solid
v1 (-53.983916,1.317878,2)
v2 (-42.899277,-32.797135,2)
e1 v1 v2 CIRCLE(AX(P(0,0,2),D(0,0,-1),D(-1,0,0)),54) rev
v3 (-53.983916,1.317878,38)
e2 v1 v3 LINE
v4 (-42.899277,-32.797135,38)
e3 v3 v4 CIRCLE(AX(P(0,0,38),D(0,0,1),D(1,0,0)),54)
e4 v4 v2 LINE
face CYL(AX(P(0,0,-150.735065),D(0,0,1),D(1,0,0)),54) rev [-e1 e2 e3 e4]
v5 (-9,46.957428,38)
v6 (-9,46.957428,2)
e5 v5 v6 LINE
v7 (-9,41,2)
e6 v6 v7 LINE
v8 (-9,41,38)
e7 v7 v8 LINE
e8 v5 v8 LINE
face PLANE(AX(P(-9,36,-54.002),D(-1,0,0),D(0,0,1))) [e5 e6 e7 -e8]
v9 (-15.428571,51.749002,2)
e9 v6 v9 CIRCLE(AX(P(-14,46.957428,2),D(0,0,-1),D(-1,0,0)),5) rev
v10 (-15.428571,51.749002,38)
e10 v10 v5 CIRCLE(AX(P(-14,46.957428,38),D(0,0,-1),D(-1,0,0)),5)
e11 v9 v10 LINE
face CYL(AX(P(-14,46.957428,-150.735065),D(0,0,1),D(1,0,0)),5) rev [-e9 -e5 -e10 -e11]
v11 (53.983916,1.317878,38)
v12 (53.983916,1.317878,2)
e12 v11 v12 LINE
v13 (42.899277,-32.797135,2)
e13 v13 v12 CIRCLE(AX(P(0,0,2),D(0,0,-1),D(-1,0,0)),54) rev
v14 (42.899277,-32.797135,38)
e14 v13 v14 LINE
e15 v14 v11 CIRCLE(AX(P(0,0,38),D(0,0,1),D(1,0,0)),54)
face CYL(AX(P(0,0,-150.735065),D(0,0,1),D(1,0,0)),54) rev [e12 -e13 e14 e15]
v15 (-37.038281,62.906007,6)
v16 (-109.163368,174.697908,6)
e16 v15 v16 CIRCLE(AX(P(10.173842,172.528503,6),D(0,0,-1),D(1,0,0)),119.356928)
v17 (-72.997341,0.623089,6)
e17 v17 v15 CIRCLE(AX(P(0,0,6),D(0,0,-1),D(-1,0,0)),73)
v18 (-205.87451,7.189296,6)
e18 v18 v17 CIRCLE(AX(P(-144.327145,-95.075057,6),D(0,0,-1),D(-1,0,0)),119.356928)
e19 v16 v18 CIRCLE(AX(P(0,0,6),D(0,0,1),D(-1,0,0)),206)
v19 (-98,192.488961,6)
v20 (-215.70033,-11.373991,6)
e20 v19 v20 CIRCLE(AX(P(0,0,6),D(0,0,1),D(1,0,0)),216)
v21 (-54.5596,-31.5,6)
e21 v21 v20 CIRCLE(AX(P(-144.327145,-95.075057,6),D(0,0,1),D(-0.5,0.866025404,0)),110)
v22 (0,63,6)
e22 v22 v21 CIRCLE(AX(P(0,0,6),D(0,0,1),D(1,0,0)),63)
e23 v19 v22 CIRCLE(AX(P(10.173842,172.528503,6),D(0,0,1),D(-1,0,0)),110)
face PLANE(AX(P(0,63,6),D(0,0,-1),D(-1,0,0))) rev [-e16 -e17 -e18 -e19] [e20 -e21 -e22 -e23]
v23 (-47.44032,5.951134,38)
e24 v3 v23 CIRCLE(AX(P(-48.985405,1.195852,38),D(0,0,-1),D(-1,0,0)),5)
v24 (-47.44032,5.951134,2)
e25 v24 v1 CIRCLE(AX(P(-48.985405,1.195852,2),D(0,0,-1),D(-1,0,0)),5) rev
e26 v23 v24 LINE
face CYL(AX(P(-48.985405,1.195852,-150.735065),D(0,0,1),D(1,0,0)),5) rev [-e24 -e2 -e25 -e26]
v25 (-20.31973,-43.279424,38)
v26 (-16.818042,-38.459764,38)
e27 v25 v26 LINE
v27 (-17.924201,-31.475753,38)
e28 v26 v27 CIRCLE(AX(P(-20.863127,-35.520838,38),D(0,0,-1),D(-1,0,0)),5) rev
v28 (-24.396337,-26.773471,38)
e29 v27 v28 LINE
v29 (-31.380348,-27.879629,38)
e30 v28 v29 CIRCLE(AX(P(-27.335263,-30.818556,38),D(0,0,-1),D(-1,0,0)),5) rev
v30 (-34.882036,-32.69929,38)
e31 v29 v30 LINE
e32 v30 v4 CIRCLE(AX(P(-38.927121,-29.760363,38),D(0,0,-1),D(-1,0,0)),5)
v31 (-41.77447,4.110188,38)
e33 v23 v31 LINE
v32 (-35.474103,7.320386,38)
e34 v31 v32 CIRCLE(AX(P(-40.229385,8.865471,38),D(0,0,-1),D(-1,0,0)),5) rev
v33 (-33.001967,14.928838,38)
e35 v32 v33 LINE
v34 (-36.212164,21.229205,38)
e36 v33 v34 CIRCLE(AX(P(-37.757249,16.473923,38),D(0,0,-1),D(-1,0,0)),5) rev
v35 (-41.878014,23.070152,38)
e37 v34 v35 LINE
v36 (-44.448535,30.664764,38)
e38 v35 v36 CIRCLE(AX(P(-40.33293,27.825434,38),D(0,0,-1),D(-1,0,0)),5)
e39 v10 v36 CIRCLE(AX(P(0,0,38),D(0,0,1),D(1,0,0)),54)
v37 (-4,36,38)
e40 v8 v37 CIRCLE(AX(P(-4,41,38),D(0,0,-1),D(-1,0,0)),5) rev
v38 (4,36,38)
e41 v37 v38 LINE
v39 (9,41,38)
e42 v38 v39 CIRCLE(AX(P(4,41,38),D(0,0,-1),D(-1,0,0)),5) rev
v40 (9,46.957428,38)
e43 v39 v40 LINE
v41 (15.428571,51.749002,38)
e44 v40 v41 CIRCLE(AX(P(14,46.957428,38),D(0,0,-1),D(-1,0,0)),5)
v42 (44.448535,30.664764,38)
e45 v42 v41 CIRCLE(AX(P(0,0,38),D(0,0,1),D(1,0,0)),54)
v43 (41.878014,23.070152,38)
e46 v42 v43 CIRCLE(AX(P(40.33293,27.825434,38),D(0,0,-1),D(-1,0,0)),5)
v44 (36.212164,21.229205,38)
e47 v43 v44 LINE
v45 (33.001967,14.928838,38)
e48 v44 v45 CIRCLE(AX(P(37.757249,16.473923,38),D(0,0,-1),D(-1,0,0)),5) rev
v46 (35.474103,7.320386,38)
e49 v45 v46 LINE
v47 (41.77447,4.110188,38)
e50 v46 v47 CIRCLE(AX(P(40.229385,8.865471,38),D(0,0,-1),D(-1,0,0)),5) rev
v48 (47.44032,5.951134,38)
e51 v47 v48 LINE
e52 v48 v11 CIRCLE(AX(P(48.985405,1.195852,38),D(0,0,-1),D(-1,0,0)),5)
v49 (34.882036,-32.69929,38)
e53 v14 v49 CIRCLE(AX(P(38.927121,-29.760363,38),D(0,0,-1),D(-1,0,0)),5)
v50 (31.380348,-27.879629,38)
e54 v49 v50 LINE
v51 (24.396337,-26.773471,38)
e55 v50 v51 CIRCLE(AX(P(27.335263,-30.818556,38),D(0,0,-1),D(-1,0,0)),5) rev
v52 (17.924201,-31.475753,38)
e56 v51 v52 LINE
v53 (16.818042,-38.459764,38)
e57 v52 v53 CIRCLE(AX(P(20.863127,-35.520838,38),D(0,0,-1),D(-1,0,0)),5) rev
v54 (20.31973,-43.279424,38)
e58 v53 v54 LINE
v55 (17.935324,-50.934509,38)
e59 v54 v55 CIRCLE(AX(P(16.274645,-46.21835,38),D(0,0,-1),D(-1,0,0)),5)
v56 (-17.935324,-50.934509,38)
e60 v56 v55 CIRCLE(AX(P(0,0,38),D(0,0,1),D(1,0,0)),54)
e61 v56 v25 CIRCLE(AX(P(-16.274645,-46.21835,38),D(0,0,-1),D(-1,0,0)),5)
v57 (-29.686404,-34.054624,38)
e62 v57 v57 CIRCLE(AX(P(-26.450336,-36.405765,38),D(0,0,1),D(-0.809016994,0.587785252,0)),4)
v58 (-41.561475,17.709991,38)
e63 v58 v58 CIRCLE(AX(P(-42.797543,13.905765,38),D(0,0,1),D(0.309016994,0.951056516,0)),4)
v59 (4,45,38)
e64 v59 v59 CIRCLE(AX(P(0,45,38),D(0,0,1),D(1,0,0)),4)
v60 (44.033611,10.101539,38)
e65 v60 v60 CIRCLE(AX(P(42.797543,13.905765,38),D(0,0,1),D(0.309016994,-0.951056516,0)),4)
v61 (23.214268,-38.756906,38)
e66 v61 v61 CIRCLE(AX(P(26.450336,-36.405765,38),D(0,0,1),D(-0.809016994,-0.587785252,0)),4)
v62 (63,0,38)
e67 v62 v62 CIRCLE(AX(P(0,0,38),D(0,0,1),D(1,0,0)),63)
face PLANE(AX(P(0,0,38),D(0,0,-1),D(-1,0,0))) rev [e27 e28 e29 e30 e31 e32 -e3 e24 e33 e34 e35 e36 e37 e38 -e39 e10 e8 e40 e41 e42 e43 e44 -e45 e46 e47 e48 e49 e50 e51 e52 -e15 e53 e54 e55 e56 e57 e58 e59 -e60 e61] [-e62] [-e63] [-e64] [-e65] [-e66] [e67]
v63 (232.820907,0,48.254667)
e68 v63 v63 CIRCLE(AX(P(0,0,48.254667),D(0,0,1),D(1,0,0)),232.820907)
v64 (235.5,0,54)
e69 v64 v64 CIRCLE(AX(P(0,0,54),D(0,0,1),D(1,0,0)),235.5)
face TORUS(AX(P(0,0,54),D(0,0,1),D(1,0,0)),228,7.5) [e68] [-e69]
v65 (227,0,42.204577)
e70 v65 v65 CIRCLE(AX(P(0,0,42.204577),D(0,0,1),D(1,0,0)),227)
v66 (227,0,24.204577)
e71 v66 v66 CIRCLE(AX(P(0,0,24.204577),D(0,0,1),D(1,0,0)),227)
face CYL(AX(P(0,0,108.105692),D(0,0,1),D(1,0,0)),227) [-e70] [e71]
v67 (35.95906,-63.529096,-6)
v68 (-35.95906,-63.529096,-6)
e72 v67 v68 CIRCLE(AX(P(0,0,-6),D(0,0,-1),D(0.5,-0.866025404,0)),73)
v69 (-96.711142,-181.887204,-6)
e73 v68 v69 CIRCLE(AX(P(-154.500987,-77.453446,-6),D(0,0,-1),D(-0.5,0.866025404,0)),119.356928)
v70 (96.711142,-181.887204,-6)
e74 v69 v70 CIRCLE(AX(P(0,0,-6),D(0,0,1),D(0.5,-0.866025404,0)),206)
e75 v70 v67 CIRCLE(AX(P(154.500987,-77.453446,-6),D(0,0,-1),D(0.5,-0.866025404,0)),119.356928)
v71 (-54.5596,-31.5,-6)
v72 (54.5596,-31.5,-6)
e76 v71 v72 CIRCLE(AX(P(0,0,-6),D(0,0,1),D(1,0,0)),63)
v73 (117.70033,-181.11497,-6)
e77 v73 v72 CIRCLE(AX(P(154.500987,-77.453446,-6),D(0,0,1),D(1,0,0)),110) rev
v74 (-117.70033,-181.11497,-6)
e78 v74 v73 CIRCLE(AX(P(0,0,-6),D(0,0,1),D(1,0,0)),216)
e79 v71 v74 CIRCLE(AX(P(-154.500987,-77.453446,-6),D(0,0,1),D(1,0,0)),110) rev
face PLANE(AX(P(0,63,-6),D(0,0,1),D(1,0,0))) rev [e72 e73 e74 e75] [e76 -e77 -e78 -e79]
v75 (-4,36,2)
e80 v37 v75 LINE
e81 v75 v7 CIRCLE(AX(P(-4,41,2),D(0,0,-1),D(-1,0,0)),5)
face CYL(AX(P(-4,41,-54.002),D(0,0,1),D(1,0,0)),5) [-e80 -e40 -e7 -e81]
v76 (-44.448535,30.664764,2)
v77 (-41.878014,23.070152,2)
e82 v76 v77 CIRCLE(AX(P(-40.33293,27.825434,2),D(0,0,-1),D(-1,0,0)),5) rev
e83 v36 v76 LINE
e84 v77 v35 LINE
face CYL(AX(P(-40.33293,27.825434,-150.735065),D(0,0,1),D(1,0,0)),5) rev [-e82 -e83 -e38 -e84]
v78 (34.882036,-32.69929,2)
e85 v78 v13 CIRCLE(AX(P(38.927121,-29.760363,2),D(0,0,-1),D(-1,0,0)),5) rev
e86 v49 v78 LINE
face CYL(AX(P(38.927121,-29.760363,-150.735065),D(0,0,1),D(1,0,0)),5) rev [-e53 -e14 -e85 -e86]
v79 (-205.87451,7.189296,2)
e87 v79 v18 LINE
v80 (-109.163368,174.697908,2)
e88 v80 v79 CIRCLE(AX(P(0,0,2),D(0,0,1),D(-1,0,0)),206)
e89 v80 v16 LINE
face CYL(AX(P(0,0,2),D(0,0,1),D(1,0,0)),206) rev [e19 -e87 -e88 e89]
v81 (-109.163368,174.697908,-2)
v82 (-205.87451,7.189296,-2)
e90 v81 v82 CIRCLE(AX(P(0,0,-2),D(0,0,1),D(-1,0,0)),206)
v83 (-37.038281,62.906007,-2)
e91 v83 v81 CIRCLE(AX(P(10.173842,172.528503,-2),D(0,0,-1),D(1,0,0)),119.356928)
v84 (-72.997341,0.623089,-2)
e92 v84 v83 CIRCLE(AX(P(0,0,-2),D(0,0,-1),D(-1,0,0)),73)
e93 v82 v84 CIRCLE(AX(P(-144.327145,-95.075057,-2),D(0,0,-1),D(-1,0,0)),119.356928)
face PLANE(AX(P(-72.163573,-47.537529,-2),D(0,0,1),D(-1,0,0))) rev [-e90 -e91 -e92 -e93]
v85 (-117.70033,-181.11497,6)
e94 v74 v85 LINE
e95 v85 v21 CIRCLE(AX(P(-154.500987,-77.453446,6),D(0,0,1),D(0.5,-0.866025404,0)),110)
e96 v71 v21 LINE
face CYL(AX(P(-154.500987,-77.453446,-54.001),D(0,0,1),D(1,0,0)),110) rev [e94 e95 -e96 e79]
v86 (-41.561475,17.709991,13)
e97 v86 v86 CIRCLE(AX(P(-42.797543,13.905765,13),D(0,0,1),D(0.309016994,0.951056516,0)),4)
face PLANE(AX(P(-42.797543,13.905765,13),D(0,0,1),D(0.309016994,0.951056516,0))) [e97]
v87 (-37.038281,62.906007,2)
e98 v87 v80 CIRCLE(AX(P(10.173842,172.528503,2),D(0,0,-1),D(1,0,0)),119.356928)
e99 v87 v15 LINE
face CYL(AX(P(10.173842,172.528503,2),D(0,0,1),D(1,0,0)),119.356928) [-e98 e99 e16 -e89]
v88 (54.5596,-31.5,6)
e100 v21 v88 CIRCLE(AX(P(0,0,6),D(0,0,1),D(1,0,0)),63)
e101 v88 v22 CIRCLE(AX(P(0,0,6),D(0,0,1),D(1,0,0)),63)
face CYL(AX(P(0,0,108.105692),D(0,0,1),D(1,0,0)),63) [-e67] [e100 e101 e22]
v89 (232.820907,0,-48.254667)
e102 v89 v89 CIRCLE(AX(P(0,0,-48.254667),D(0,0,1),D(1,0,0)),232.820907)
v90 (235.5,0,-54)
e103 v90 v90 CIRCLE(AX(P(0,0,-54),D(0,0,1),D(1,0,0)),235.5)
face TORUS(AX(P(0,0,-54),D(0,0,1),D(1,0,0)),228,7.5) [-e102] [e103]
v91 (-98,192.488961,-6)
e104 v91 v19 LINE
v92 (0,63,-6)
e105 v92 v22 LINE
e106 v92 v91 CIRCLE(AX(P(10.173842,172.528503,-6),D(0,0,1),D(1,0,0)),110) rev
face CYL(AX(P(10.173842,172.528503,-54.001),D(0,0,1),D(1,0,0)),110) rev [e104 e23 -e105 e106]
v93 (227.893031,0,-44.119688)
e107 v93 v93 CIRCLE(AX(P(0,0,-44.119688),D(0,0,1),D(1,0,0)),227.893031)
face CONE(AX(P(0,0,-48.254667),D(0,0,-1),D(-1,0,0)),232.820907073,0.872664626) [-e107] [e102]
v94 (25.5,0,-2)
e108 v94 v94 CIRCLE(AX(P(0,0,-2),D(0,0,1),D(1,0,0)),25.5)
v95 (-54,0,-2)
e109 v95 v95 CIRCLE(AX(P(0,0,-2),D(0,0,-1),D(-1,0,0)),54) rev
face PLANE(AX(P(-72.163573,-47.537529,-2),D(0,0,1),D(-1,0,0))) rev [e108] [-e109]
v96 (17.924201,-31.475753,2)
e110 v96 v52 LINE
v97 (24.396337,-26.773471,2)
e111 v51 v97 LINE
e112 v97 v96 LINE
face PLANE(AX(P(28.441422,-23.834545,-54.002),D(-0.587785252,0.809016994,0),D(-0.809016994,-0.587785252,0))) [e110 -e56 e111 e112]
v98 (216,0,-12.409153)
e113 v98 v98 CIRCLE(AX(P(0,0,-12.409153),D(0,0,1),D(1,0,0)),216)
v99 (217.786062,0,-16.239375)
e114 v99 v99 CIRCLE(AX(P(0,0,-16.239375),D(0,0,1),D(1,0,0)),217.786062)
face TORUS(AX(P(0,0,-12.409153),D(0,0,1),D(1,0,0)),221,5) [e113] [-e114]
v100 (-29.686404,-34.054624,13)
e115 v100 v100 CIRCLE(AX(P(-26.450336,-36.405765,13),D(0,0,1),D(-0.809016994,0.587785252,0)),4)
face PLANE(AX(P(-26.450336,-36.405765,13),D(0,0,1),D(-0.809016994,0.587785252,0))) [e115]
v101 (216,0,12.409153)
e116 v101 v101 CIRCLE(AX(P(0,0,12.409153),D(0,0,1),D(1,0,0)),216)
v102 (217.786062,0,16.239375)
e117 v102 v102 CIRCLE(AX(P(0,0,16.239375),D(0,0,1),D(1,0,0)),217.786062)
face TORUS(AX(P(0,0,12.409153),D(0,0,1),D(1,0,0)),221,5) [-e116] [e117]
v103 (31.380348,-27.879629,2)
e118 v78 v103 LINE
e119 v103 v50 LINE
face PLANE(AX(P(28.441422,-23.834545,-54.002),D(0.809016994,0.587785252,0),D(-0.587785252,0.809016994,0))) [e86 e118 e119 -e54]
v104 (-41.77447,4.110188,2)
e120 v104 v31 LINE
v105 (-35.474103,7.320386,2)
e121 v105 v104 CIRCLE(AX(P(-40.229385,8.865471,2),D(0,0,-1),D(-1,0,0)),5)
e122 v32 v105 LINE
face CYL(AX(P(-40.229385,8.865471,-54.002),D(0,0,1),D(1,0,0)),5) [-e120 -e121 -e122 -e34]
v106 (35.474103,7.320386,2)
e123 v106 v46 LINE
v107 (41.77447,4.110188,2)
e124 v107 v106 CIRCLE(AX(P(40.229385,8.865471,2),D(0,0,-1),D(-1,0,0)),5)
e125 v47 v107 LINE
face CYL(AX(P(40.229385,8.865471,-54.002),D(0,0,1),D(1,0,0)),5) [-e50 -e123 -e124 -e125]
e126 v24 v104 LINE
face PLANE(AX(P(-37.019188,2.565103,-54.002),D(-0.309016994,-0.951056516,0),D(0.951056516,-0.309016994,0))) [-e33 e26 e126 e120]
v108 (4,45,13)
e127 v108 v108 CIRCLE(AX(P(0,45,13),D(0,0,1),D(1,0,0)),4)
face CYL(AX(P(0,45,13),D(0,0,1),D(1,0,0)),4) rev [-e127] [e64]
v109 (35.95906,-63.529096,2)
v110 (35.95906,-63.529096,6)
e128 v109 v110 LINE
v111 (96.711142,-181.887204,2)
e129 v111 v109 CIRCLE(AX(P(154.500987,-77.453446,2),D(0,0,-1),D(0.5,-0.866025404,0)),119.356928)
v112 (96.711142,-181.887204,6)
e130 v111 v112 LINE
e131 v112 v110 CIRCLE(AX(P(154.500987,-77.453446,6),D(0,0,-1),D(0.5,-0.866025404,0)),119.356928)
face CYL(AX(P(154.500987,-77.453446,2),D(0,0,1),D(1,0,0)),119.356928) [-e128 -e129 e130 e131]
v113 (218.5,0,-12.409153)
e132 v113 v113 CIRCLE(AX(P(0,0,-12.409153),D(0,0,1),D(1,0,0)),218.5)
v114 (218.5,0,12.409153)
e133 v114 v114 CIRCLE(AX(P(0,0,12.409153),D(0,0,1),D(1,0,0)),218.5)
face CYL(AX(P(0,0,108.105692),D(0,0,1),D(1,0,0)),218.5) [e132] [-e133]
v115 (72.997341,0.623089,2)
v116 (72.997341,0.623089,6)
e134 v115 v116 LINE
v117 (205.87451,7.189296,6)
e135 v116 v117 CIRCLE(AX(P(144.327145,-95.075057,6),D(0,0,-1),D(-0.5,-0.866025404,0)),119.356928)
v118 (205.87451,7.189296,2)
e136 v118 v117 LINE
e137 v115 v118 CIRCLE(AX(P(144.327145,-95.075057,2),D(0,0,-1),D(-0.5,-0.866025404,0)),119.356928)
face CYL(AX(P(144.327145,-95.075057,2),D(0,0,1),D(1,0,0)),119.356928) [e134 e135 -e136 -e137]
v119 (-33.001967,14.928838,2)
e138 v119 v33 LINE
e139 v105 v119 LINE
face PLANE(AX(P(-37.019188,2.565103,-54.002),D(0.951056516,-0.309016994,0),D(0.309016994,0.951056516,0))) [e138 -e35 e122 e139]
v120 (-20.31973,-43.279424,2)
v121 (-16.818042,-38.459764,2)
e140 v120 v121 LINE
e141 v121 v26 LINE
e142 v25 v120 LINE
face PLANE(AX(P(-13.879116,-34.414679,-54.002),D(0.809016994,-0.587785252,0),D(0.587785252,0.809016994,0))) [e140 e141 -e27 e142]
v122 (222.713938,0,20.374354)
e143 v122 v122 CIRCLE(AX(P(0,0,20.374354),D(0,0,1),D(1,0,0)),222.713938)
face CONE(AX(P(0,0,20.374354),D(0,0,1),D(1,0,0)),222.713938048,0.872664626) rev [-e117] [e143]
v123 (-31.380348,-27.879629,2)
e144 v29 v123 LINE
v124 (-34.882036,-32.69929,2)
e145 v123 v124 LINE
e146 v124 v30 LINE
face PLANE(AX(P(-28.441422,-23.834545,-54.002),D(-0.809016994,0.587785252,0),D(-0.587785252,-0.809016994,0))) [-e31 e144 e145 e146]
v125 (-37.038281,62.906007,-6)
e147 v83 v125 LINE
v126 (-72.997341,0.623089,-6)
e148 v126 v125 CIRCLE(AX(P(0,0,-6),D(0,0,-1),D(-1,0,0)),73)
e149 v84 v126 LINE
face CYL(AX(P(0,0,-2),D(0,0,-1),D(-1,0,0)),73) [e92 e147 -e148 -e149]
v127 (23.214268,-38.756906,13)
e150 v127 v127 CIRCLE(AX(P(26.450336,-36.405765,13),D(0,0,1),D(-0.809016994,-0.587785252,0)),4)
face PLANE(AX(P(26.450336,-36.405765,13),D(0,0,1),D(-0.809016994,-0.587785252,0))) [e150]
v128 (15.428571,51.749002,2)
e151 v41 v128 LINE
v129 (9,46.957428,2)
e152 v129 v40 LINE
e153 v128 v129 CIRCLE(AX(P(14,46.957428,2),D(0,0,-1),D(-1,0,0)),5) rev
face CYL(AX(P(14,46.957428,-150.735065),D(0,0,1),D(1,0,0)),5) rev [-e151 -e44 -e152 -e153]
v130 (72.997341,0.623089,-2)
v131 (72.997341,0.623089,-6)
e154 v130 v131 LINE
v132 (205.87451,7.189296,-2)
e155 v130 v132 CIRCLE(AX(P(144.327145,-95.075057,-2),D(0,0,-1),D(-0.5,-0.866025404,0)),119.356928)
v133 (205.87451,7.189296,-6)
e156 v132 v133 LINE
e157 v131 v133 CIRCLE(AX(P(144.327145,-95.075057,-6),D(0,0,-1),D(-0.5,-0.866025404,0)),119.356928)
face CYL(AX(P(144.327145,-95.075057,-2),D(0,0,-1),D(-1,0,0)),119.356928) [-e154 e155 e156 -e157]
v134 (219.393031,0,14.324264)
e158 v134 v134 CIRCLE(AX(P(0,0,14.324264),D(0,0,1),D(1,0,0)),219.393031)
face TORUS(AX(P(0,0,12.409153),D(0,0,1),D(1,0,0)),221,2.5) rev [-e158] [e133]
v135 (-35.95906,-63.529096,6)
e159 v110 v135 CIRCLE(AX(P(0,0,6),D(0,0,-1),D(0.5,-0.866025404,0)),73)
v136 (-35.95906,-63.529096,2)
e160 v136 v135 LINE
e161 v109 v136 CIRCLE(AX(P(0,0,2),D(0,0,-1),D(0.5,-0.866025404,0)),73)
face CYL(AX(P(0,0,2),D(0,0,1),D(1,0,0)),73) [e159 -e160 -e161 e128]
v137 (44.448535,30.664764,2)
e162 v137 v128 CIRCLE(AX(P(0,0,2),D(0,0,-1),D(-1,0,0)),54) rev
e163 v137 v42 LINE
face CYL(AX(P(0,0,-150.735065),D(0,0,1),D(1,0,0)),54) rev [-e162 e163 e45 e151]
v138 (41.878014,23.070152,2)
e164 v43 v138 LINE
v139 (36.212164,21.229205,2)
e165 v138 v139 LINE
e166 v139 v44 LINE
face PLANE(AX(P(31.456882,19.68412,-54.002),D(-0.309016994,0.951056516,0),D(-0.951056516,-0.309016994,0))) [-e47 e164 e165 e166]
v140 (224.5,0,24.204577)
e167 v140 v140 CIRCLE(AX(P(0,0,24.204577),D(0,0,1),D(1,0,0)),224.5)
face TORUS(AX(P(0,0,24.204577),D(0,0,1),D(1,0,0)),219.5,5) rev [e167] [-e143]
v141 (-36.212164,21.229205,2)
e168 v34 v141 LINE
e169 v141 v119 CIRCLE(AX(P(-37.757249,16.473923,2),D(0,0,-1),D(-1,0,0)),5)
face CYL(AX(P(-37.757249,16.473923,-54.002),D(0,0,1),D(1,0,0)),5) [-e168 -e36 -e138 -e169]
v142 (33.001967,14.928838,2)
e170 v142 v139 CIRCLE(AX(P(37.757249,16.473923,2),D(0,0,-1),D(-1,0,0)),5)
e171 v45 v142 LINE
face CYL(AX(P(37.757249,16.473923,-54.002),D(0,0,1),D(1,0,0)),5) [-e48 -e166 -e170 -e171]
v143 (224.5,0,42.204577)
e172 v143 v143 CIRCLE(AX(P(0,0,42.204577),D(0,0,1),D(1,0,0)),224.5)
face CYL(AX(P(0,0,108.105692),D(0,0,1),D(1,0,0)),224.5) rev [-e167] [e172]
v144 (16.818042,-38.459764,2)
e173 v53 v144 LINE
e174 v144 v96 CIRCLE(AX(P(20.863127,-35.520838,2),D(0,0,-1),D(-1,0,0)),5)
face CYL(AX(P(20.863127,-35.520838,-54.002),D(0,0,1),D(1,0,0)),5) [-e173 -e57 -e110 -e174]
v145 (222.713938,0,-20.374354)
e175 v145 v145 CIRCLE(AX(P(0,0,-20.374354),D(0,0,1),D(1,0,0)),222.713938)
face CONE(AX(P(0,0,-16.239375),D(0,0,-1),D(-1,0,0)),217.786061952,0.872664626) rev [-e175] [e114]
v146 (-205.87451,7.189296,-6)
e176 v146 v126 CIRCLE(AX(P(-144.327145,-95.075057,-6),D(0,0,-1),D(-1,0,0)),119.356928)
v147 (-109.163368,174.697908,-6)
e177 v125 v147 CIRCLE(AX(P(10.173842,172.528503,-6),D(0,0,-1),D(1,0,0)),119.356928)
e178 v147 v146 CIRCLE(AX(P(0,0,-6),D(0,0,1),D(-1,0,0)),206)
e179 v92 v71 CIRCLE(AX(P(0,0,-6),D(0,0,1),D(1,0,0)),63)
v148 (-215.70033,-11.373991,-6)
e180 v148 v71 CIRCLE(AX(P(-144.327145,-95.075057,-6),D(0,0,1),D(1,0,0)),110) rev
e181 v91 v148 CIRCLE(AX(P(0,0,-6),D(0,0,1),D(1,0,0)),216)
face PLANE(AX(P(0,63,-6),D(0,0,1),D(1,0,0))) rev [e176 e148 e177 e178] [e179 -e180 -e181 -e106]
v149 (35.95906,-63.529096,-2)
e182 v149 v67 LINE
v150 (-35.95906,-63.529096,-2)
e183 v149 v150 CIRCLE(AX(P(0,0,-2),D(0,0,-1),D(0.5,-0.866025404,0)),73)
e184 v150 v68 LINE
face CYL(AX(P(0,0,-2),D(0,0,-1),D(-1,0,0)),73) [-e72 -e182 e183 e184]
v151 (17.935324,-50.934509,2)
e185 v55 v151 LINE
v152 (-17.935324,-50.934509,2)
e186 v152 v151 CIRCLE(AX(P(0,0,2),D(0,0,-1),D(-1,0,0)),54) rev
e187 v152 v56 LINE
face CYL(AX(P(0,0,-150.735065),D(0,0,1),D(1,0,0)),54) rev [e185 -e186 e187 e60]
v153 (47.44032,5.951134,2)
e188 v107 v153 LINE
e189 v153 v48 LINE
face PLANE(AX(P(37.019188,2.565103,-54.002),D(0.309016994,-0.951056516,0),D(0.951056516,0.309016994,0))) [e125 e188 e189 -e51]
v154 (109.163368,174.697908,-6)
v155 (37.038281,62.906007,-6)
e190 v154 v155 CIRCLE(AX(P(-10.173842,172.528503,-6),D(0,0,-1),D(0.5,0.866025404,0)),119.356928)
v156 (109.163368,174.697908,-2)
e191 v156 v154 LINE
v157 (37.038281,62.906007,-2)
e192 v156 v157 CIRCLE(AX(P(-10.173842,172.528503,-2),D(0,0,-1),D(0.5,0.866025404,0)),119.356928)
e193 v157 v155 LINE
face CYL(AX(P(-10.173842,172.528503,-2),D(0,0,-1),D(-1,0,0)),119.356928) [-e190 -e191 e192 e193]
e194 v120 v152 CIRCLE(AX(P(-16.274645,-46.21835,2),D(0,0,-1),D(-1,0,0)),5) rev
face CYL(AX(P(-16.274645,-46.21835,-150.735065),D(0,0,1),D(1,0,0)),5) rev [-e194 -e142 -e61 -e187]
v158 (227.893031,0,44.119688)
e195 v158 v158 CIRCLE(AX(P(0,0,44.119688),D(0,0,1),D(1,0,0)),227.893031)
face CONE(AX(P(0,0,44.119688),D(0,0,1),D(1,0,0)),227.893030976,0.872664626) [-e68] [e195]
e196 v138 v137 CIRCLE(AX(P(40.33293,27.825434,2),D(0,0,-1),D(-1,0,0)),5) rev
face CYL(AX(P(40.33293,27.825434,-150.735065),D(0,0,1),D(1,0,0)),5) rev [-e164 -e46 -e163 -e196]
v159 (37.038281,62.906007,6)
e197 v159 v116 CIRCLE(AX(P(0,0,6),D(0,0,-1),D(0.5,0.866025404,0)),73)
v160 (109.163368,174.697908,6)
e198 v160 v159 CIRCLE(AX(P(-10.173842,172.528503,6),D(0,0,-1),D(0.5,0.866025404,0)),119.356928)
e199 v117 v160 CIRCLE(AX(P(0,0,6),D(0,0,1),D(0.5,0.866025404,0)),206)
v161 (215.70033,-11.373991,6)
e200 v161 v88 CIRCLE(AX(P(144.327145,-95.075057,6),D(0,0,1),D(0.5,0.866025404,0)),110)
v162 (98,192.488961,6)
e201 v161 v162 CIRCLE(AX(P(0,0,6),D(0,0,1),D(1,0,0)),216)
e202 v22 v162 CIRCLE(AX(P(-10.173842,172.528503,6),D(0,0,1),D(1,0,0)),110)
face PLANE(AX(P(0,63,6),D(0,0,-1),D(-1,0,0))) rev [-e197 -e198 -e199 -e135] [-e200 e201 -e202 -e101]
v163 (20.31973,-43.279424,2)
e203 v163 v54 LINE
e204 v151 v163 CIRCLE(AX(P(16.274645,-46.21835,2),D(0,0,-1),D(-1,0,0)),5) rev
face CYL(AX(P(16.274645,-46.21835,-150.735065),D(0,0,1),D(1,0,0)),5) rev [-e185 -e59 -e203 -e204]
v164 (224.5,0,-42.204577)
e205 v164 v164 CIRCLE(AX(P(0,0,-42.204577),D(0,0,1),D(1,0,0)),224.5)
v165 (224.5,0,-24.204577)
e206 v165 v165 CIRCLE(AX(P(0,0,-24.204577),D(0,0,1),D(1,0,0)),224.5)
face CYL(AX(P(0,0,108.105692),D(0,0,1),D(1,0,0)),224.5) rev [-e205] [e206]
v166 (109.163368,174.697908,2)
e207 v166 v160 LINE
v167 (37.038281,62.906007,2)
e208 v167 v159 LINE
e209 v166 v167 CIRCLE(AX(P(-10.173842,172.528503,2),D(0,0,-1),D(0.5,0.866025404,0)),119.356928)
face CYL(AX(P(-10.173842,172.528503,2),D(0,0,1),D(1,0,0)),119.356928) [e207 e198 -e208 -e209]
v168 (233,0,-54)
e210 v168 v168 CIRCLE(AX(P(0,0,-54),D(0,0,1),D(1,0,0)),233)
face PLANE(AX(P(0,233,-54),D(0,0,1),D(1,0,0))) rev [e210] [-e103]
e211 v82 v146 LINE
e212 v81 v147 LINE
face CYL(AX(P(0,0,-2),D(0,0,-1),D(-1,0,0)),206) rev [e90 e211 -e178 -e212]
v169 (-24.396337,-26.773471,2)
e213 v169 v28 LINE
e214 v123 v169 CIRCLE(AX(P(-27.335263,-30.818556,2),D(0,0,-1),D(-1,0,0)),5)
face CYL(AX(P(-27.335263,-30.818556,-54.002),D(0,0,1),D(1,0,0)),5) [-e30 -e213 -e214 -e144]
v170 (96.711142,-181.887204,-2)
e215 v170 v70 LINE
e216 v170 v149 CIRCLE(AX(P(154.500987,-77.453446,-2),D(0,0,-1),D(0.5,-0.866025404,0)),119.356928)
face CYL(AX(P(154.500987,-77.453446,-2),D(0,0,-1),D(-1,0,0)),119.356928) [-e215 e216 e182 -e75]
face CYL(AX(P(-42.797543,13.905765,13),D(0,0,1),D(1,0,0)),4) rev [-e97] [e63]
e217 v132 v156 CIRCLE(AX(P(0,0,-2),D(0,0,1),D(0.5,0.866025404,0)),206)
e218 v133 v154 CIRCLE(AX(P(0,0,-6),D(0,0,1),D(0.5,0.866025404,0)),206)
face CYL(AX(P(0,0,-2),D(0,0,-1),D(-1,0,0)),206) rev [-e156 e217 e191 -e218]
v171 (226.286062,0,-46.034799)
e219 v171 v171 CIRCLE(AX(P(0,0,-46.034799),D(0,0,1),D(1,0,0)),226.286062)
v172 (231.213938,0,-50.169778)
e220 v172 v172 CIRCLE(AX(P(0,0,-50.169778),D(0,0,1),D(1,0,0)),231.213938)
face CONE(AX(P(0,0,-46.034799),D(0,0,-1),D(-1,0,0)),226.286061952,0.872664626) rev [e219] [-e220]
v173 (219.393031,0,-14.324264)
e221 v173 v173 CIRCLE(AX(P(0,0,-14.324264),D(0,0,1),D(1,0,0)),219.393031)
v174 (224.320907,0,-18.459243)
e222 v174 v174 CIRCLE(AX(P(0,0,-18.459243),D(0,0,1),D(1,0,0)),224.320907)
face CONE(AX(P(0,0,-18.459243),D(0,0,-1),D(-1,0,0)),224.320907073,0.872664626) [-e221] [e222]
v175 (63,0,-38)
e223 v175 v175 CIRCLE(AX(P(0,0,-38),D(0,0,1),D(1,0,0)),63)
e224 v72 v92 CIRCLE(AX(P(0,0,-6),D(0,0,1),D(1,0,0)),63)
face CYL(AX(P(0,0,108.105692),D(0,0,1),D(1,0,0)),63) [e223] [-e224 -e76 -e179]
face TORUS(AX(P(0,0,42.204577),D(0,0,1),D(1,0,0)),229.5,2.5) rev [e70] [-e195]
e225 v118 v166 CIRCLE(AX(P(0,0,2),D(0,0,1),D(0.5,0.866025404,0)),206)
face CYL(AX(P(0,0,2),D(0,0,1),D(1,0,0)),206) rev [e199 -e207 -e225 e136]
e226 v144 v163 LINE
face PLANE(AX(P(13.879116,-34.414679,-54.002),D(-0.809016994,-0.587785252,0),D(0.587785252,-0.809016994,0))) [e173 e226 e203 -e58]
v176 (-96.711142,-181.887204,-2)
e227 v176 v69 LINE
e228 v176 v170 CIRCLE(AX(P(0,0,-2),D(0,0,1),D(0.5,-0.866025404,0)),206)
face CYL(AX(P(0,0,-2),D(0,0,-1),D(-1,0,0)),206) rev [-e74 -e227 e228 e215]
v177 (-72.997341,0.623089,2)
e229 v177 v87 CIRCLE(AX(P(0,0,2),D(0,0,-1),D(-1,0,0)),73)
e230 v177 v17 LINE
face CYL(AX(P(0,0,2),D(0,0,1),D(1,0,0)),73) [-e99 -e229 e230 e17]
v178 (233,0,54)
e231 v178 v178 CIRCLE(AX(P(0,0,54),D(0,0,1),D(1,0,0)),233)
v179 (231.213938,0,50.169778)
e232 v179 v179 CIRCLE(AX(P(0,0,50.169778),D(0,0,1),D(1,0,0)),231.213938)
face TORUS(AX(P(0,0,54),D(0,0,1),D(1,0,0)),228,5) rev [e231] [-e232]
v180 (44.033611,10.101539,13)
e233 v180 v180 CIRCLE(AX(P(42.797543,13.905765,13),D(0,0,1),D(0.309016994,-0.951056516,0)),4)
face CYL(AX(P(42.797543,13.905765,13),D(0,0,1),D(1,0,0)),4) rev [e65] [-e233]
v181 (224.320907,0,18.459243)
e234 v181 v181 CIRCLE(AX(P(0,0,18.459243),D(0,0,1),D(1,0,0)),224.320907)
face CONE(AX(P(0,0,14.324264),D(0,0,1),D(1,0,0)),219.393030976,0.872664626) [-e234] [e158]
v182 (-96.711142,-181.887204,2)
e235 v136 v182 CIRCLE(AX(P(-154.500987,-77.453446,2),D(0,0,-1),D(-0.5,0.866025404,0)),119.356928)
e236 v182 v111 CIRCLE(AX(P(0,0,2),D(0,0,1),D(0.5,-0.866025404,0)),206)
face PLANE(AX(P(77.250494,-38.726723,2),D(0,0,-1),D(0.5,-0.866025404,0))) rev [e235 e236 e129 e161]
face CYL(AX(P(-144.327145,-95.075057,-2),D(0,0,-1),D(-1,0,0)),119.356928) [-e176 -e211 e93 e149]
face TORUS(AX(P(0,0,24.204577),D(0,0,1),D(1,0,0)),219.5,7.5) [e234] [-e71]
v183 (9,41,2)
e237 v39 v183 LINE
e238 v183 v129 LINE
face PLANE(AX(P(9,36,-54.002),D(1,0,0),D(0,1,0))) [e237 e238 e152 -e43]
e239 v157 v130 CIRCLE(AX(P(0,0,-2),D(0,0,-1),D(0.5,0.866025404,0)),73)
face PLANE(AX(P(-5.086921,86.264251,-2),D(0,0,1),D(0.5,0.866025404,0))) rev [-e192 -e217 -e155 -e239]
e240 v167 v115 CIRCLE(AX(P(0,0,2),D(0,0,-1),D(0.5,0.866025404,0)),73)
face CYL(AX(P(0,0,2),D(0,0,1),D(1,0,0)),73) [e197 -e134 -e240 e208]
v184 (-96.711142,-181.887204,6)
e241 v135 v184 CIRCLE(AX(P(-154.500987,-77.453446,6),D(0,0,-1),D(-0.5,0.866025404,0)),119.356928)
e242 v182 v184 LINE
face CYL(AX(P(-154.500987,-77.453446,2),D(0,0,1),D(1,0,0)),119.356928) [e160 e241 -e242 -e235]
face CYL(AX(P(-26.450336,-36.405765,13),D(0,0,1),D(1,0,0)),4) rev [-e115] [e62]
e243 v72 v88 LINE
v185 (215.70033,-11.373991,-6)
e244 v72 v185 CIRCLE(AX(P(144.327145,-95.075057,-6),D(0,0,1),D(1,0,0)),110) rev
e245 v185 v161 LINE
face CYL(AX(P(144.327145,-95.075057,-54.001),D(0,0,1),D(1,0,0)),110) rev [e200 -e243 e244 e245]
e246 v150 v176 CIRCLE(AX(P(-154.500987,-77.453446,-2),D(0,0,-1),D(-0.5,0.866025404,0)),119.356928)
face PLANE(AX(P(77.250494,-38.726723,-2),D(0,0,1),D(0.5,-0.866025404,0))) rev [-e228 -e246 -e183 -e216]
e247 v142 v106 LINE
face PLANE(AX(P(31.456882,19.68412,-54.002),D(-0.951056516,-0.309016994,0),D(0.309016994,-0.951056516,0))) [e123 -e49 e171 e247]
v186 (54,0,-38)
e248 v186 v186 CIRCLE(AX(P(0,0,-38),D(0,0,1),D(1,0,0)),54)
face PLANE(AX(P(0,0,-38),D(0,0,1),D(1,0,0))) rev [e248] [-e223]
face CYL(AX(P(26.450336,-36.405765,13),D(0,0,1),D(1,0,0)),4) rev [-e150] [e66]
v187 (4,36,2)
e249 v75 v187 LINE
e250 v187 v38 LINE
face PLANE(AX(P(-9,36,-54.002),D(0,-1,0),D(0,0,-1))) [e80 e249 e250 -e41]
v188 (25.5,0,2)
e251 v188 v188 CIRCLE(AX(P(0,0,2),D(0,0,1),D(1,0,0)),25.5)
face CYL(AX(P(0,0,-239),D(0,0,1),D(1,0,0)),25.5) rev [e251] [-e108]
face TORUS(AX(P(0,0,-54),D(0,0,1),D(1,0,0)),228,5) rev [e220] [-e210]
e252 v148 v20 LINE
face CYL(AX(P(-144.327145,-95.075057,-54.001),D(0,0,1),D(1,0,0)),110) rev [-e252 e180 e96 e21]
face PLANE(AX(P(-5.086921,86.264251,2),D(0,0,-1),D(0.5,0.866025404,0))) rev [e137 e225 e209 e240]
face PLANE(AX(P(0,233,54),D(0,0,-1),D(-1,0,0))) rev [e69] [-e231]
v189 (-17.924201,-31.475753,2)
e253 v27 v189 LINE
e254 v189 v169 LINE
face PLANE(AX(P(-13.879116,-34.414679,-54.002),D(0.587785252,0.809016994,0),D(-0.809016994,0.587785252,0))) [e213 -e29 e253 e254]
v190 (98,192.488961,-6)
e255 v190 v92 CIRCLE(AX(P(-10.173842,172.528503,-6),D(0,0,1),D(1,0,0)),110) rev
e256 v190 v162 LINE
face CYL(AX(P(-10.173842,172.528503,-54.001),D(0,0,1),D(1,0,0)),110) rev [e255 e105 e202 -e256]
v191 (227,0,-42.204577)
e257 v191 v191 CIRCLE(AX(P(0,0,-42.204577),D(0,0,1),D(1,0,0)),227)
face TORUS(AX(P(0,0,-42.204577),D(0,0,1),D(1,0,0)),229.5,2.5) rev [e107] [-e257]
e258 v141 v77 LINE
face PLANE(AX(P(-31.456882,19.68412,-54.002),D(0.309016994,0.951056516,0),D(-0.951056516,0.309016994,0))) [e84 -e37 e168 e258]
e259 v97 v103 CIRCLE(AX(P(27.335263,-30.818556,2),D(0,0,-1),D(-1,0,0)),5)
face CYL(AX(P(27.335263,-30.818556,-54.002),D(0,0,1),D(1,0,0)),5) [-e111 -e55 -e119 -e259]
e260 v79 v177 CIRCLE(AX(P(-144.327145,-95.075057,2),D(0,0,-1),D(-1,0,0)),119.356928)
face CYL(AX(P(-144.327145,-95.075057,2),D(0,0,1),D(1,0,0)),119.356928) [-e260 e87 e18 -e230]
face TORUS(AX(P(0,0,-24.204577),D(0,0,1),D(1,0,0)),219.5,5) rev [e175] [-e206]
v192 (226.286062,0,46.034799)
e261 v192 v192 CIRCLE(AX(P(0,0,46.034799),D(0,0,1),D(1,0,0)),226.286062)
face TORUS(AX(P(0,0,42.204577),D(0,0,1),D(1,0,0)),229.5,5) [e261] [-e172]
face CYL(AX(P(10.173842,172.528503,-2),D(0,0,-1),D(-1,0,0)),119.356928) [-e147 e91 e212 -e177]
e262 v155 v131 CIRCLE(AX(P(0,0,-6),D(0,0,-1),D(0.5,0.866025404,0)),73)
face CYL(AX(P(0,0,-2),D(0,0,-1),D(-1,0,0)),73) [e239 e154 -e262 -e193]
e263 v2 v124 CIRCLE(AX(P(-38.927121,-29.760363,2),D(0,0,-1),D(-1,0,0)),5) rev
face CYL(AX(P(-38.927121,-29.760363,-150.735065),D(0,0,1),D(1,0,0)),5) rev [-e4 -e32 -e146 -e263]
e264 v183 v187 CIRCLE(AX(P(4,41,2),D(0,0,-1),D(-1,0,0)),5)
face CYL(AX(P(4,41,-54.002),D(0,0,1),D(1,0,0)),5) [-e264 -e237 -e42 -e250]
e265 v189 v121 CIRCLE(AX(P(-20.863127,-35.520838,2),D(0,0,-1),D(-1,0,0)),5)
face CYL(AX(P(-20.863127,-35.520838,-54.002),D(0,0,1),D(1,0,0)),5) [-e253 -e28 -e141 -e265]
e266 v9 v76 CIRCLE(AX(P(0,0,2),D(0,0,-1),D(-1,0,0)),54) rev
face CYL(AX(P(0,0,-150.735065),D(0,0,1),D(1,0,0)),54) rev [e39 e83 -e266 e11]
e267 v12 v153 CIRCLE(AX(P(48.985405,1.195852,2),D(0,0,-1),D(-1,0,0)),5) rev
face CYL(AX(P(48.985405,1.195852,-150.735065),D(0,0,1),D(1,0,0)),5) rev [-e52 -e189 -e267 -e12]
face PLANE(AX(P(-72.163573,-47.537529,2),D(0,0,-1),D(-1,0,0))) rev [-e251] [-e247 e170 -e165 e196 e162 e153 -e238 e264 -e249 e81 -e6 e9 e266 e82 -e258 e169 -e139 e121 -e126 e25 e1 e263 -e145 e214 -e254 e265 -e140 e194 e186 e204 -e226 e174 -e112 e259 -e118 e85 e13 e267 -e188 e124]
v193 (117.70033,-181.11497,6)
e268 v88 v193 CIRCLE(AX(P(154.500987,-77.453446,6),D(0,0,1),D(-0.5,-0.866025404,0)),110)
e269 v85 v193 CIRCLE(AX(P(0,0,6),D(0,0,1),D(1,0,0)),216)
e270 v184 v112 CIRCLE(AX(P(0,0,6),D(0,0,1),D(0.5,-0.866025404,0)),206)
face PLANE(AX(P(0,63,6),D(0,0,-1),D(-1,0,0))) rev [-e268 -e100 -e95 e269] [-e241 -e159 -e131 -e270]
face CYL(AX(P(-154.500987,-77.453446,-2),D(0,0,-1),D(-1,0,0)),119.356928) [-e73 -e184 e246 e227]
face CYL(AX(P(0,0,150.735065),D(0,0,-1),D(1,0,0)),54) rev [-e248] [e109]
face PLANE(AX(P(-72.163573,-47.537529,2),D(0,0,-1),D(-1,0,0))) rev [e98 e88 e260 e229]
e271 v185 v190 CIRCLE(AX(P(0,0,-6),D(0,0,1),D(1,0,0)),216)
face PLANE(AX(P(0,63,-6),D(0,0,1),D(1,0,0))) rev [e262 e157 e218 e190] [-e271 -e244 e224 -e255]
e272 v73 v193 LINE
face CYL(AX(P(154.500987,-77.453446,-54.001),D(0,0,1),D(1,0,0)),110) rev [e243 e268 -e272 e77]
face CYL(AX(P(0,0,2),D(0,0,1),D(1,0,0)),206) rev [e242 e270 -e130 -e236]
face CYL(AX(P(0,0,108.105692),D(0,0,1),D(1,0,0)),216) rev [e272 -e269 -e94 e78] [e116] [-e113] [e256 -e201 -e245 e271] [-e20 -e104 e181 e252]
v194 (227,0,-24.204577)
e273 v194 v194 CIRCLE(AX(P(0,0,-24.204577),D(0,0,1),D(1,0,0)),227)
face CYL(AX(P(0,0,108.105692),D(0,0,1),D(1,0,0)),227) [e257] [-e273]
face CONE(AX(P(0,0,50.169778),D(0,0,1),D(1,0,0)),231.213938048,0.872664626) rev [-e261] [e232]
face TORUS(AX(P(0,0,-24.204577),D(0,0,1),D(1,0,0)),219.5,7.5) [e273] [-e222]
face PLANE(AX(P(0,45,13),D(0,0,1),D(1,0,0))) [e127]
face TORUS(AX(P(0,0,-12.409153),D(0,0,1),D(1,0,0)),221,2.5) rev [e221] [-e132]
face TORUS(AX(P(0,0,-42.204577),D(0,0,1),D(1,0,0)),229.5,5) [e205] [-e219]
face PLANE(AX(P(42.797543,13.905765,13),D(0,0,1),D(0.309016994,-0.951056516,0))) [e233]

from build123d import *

# Parameters (mm, degrees)
CUT_EXTRUDE1_REACH   = 340.409
CIRPATTERN1_COUNT    = 3
CUT_EXTRUDE2_DEPTH   = 4
CIRPATTERN2_COUNT    = 3
MIRROR1_COPY_1_DEPTH = 4
MIRROR1_COPY_2_DEPTH = 4
CUT_EXTRUDE3_START   = -36
SKETCH4_R            = 54
CUT_EXTRUDE3_DEPTH   = 36
SKETCH5_R            = 25.5
CUT_EXTRUDE4_DEPTH   = 241
BOSS_EXTRUDE1_REACH  = 347.521
SKETCH7_R            = 4
CUT_EXTRUDE5_DEPTH   = 25
CIRPATTERN4_COUNT    = 5
FILLET1_START        = 2
FILLET1_DEPTH        = 37
FILLET1_START_2      = 1
FILLET1_2_DEPTH      = 37


with BuildPart() as part:
    # Sketch1 → Revolve1 (revolve)
    with BuildSketch(Plane(origin=(0, 0, 0), x_dir=(0, 0, -1), z_dir=(1, 0, 0)), mode=Mode.PRIVATE) as revolve1_sk:
        with BuildLine():
            Line((-38, 0), (38, 0))
            Line((38, 0), (38, 63))
            Line((38, 63), (6, 63))
            Line((6, 63), (6, 216))
            Line((6, 216), (12.409153107, 216))
            ThreePointArc((12.409153107, 216), (14.522244416, 216.468461065), (16.239375322, 217.786061952))
            Line((16.239375322, 217.786061952), (20.374354338, 222.713938048))
            ThreePointArc((20.374354338, 222.713938048), (22.091485245, 224.031538935), (24.204576553, 224.5))
            Line((24.204576553, 224.5), (42.204576553, 224.5))
            ThreePointArc((42.204576553, 224.5), (44.317667862, 224.968461065), (46.034798769, 226.286061952))
            Line((46.034798769, 226.286061952), (50.169777784, 231.213938048))
            ThreePointArc((50.169777784, 231.213938048), (51.886908691, 232.531538935), (54, 233))
            Line((54, 233), (54, 235.5))
            ThreePointArc((54, 235.5), (50.830363037, 234.797308403), (48.254666677, 232.820907073))
            Line((48.254666677, 232.820907073), (44.119687661, 227.893030976))
            ThreePointArc((44.119687661, 227.893030976), (43.261122208, 227.234230532), (42.204576553, 227))
            Line((42.204576553, 227), (24.204576553, 227))
            ThreePointArc((24.204576553, 227), (21.03493959, 226.297308403), (18.45924323, 224.320907073))
            Line((18.45924323, 224.320907073), (14.324264215, 219.393030976))
            ThreePointArc((14.324264215, 219.393030976), (13.465698761, 218.734230532), (12.409153107, 218.5))
            Line((12.409153107, 218.5), (0, 218.5))
            Line((0, 218.5), (-12.409153107, 218.5))
            ThreePointArc((-12.409153107, 218.5), (-13.465698761, 218.734230532), (-14.324264215, 219.393030976))
            Line((-14.324264215, 219.393030976), (-18.45924323, 224.320907073))
            ThreePointArc((-18.45924323, 224.320907073), (-21.03493959, 226.297308403), (-24.204576553, 227))
            Line((-24.204576553, 227), (-42.204576553, 227))
            ThreePointArc((-42.204576553, 227), (-43.261122208, 227.234230532), (-44.119687661, 227.893030976))
            Line((-44.119687661, 227.893030976), (-48.254666677, 232.820907073))
            ThreePointArc((-48.254666677, 232.820907073), (-50.830363037, 234.797308403), (-54, 235.5))
            Line((-54, 235.5), (-54, 233))
            ThreePointArc((-54, 233), (-51.886908691, 232.531538935), (-50.169777784, 231.213938048))
            Line((-50.169777784, 231.213938048), (-46.034798769, 226.286061952))
            ThreePointArc((-46.034798769, 226.286061952), (-44.317667862, 224.968461065), (-42.204576553, 224.5))
            Line((-42.204576553, 224.5), (-24.204576553, 224.5))
            ThreePointArc((-24.204576553, 224.5), (-22.091485245, 224.031538935), (-20.374354338, 222.713938048))
            Line((-20.374354338, 222.713938048), (-16.239375322, 217.786061952))
            ThreePointArc((-16.239375322, 217.786061952), (-14.522244416, 216.468461065), (-12.409153107, 216))
            Line((-12.409153107, 216), (-6, 216))
            Line((-6, 216), (-6, 63))
            Line((-6, 63), (-38, 63))
            Line((-38, 63), (-38, 0))
        make_face()
    revolve(revolve1_sk.sketch.rotate(Axis((0, 0, 108.105691878), (0, 0, -1)), 90), axis=Axis((0, 0, 108.105691878), (0, 0, -1)))

    # Sketch2 → Cut-Extrude1 (cut, up to next)
    with BuildSketch(Plane.XY.offset(6), mode=Mode.PRIVATE) as cut_extrude1_sk1:
        with BuildLine():
            ThreePointArc((0, 63), (77.538137266, 106.146211007), (98, 192.488960722))
            ThreePointArc((98, 192.488960722), (0, 216), (-98, 192.488960722))
            ThreePointArc((-98, 192.488960722), (-77.538137266, 106.146211007), (0, 63))
        make_face()
    cut_extrude1_tool1 = extrude(cut_extrude1_sk1.sketch, amount=-CUT_EXTRUDE1_REACH, mode=Mode.PRIVATE) & part.part
    cut_extrude1 = cut_extrude1_tool1.solids().sort_by_distance((0, 145.943107, 6))[0]
    add(cut_extrude1, mode=Mode.SUBTRACT)

    # CirPattern1: Cut-Extrude1 ×3 about axis
    cirpattern1_axis = Axis((0, 0, 0), (0, 0, 1))
    for i in range(1, CIRPATTERN1_COUNT):
        add(cut_extrude1.rotate(cirpattern1_axis, i * 360 / CIRPATTERN1_COUNT), mode=Mode.SUBTRACT)

    # Sketch3 → Cut-Extrude2 (cut)
    with BuildSketch(Plane.XY.offset(6)):
        with BuildLine():
            ThreePointArc((-205.874510366, 7.189296321), (-178.40123318, 103), (-109.163368432, 174.697907808))
            ThreePointArc((-109.163368432, 174.697907808), (-90.120860664, 107.821094199), (-37.03828108, 62.906007143))
            ThreePointArc((-37.03828108, 62.906007143), (-63.219854476, 36.5), (-72.997340776, 0.623088756))
            ThreePointArc((-72.997340776, 0.623088756), (-138.436236972, 24.136407646), (-205.874510366, 7.189296321))
        make_face()
    cut_extrude2 = extrude(amount=-CUT_EXTRUDE2_DEPTH, mode=Mode.SUBTRACT)

    # CirPattern2: Cut-Extrude2 ×3 about axis
    cirpattern2_axis = Axis((0, 0, 0), (0, 0, 1))
    for i in range(1, CIRPATTERN2_COUNT):
        add(cut_extrude2.rotate(cirpattern2_axis, i * 360 / CIRPATTERN2_COUNT), mode=Mode.SUBTRACT)

    # Mirror1: Cut-Extrude2 across plane
    add(cut_extrude2.mirror(Plane.XY), mode=Mode.SUBTRACT)

    # Mirror1 copy 1 sketch → Mirror1 copy 1 (cut)
    with BuildSketch(Plane(origin=(0, 0, -6), x_dir=(-0.4999999999999998, 0.8660254037844387, 0), z_dir=(0, 0, -1))):
        with BuildLine():
            ThreePointArc((-205.874510366, -7.189296321), (-178.40123318, -103), (-109.163368432, -174.697907808))
            ThreePointArc((-109.163368432, -174.697907808), (-90.120860664, -107.821094199), (-37.03828108, -62.906007143))
            ThreePointArc((-37.03828108, -62.906007143), (-63.219854476, -36.5), (-72.997340776, -0.623088756))
            ThreePointArc((-72.997340776, -0.623088756), (-138.436236972, -24.136407646), (-205.874510366, -7.189296321))
        make_face()
    extrude(amount=-MIRROR1_COPY_1_DEPTH, mode=Mode.SUBTRACT)

    # Mirror1 copy 2 sketch → Mirror1 copy 2 (cut)
    with BuildSketch(Plane(origin=(0, 0, -6), x_dir=(-0.5000000000000004, -0.8660254037844384, 0), z_dir=(0, 0, -1))):
        with BuildLine():
            ThreePointArc((-205.874510366, -7.189296321), (-178.40123318, -103), (-109.163368432, -174.697907808))
            ThreePointArc((-109.163368432, -174.697907808), (-90.120860664, -107.821094199), (-37.03828108, -62.906007143))
            ThreePointArc((-37.03828108, -62.906007143), (-63.219854476, -36.5), (-72.997340776, -0.623088756))
            ThreePointArc((-72.997340776, -0.623088756), (-138.436236972, -24.136407646), (-205.874510366, -7.189296321))
        make_face()
    extrude(amount=-MIRROR1_COPY_2_DEPTH, mode=Mode.SUBTRACT)

    # Sketch4 → Cut-Extrude3 (cut)
    with BuildSketch(Plane.XY.offset(38).offset(CUT_EXTRUDE3_START)):
        Circle(SKETCH4_R)
    cut_extrude3 = extrude(amount=CUT_EXTRUDE3_DEPTH, mode=Mode.SUBTRACT)

    # Mirror4: Cut-Extrude3 across plane
    add(cut_extrude3.mirror(Plane.XY), mode=Mode.SUBTRACT)

    # Sketch5 → Cut-Extrude4 (cut)
    with BuildSketch(Plane.XY.offset(2)):
        Circle(SKETCH5_R)
    extrude(amount=-CUT_EXTRUDE4_DEPTH, mode=Mode.SUBTRACT)

    # Sketch6 → Boss-Extrude1 (add, up to next)
    with BuildSketch(Plane.XY.offset(38), mode=Mode.PRIVATE) as boss_extrude1_sk1:
        with BuildLine():
            Line((-9, 36), (9, 36))
            Line((9, 36), (9, 53.244718048))
            ThreePointArc((9, 53.244718048), (0, 54), (-9, 53.244718048))
            Line((-9, 53.244718048), (-9, 36))
        make_face()
    boss_extrude1_tool1 = extrude(boss_extrude1_sk1.sketch, amount=-BOSS_EXTRUDE1_REACH, mode=Mode.PRIVATE) - part.part
    boss_extrude1 = boss_extrude1_tool1.solids().sort_by_distance((0, 44.875899, 38))[0]
    add(boss_extrude1)

    # Sketch7 → Cut-Extrude5 (cut)
    with BuildSketch(Plane.XY.offset(38)):
        with Locations((0, 45)):
            Circle(SKETCH7_R)
    cut_extrude5 = extrude(amount=-CUT_EXTRUDE5_DEPTH, mode=Mode.SUBTRACT)

    # CirPattern4: Boss-Extrude1, Cut-Extrude5 ×5 about axis
    cirpattern4_axis = Axis((0, 0, 0), (0, 0, 1))
    add([boss_extrude1.rotate(cirpattern4_axis, i * 360 / CIRPATTERN4_COUNT) for i in range(1, CIRPATTERN4_COUNT)])
    add([cut_extrude5.rotate(cirpattern4_axis, i * 360 / CIRPATTERN4_COUNT) for i in range(1, CIRPATTERN4_COUNT)], mode=Mode.SUBTRACT)

    # Fillet1: read off the stored shape, not the designer's step
    # Fillet1 outline → Fillet1 (cut)
    with BuildSketch(Plane.XY.offset(FILLET1_START)):
        with BuildLine():
            ThreePointArc((-35.474102564, 7.320385732), (-37.959432647, 4.410438083), (-41.774470117, 4.110188123))
            Line((-41.774470117, 4.110188123), (-37.019187536, 2.565103151))
            Line((-37.019187536, 2.565103151), (-35.474102564, 7.320385732))
        make_face()
        with BuildLine():
            ThreePointArc((-36.212164219, 21.229205416), (-33.30221657, 18.743875333), (-33.001966609, 14.928837863))
            Line((-33.001966609, 14.928837863), (-31.456881637, 19.684120444))
            Line((-31.456881637, 19.684120444), (-36.212164219, 21.229205416))
        make_face()
        with BuildLine():
            Line((-28.441422032, -23.834544527), (-31.380348293, -27.879629499))
            ThreePointArc((-31.380348293, -27.879629499), (-28.117435647, -25.880114057), (-24.39633706, -26.773470788))
            Line((-24.39633706, -26.773470788), (-28.441422032, -23.834544527))
        make_face()
        with BuildLine():
            Line((-13.879116133, -34.414679068), (-17.924201105, -31.475752807))
            ThreePointArc((-17.924201105, -31.475752807), (-15.924685664, -34.738665454), (-16.818042395, -38.45976404))
            Line((-16.818042395, -38.45976404), (-13.879116133, -34.414679068))
        make_face()
        with BuildLine():
            ThreePointArc((-4, 36), (-7.535533906, 37.464466094), (-9, 41))
            Line((-9, 41), (-9, 36))
            Line((-9, 36), (-4, 36))
        make_face()
        with BuildLine():
            ThreePointArc((9, 41), (7.535533906, 37.464466094), (4, 36))
            Line((4, 36), (9, 36))
            Line((9, 36), (9, 41))
        make_face()
        with BuildLine():
            Line((13.879116133, -34.414679068), (16.818042395, -38.45976404))
            ThreePointArc((16.818042395, -38.45976404), (15.924685664, -34.738665454), (17.924201105, -31.475752807))
            Line((17.924201105, -31.475752807), (13.879116133, -34.414679068))
        make_face()
        with BuildLine():
            Line((28.441422032, -23.834544527), (24.39633706, -26.773470788))
            ThreePointArc((24.39633706, -26.773470788), (28.117435647, -25.880114057), (31.380348293, -27.879629499))
            Line((31.380348293, -27.879629499), (28.441422032, -23.834544527))
        make_face()
        with BuildLine():
            ThreePointArc((33.001966609, 14.928837863), (33.30221657, 18.743875333), (36.212164219, 21.229205416))
            Line((36.212164219, 21.229205416), (31.456881637, 19.684120444))
            Line((31.456881637, 19.684120444), (33.001966609, 14.928837863))
        make_face()
        with BuildLine():
            ThreePointArc((41.774470117, 4.110188123), (37.959432647, 4.410438083), (35.474102564, 7.320385732))
            Line((35.474102564, 7.320385732), (37.019187536, 2.565103151))
            Line((37.019187536, 2.565103151), (41.774470117, 4.110188123))
        make_face()
    extrude(amount=FILLET1_DEPTH, mode=Mode.SUBTRACT)

    # Fillet1 2 outline → Fillet1 2 (add)
    with BuildSketch(Plane.XY.offset(FILLET1_START_2)):
        with BuildLine():
            ThreePointArc((-53.983916111, 1.317877593), (-51.874748664, 5.276500769), (-47.440320388, 5.951134471))
            Line((-47.440320388, 5.951134471), (-53.419889007, 7.894014091))
            ThreePointArc((-53.419889007, 7.894014091), (-53.802469565, 4.61457135), (-53.983916111, 1.317877593))
        make_face()
        with BuildLine():
            ThreePointArc((-34.882036336, -32.699289611), (-38.866103912, -34.759991024), (-42.899276543, -32.79713512))
            ThreePointArc((-42.899276543, -32.79713512), (-40.814735232, -35.357564791), (-38.57761298, -37.785814491))
            Line((-38.57761298, -37.785814491), (-34.882036336, -32.699289611))
        make_face()
        with BuildLine():
            Line((-47.857583108, 25.013031384), (-41.878014489, 23.070151765))
            ThreePointArc((-41.878014489, 23.070151765), (-45.069002583, 26.222433439), (-44.44853457, 30.664764382))
            ThreePointArc((-44.44853457, 30.664764382), (-46.239489202, 27.891031503), (-47.857583108, 25.013031384))
        make_face()
        with BuildLine():
            ThreePointArc((-9, 53.244718048), (-12.237159283, 52.595170241), (-15.428571429, 51.749001765))
            ThreePointArc((-15.428571429, 51.749001765), (-11.011928477, 50.966346156), (-9, 46.957427527))
            Line((-9, 46.957427527), (-9, 53.244718048))
        make_face()
        with BuildLine():
            ThreePointArc((-17.935323574, -50.934508619), (-21.048429355, -47.705289339), (-20.319730437, -43.279424153))
            Line((-20.319730437, -43.279424153), (-24.015307082, -48.365949032))
            ThreePointArc((-24.015307082, -48.365949032), (-21.014595587, -49.743208303), (-17.935323574, -50.934508619))
        make_face()
        with BuildLine():
            ThreePointArc((20.319730437, -43.279424153), (21.048429355, -47.705289339), (17.935323574, -50.934508619))
            ThreePointArc((17.935323574, -50.934508619), (21.014595587, -49.743208303), (24.015307082, -48.365949032))
            Line((24.015307082, -48.365949032), (20.319730437, -43.279424153))
        make_face()
        with BuildLine():
            Line((9, 53.244718048), (9, 46.957427527))
            ThreePointArc((9, 46.957427527), (11.011928477, 50.966346156), (15.428571429, 51.749001765))
            ThreePointArc((15.428571429, 51.749001765), (12.237159283, 52.595170241), (9, 53.244718048))
        make_face()
        with BuildLine():
            ThreePointArc((47.857583108, 25.013031384), (46.239489202, 27.891031503), (44.44853457, 30.664764382))
            ThreePointArc((44.44853457, 30.664764382), (45.069002583, 26.222433439), (41.878014489, 23.070151765))
            Line((41.878014489, 23.070151765), (47.857583108, 25.013031384))
        make_face()
        with BuildLine():
            ThreePointArc((42.899276543, -32.79713512), (38.866103912, -34.759991024), (34.882036336, -32.699289611))
            Line((34.882036336, -32.699289611), (38.57761298, -37.785814491))
            ThreePointArc((38.57761298, -37.785814491), (40.814735232, -35.357564791), (42.899276543, -32.79713512))
        make_face()
        with BuildLine():
            ThreePointArc((47.440320388, 5.951134471), (51.874748664, 5.276500769), (53.983916111, 1.317877593))
            ThreePointArc((53.983916111, 1.317877593), (53.802469565, 4.61457135), (53.419889007, 7.894014091))
            Line((53.419889007, 7.894014091), (47.440320388, 5.951134471))
        make_face()
    extrude(amount=FILLET1_2_DEPTH)


solid = part.part
